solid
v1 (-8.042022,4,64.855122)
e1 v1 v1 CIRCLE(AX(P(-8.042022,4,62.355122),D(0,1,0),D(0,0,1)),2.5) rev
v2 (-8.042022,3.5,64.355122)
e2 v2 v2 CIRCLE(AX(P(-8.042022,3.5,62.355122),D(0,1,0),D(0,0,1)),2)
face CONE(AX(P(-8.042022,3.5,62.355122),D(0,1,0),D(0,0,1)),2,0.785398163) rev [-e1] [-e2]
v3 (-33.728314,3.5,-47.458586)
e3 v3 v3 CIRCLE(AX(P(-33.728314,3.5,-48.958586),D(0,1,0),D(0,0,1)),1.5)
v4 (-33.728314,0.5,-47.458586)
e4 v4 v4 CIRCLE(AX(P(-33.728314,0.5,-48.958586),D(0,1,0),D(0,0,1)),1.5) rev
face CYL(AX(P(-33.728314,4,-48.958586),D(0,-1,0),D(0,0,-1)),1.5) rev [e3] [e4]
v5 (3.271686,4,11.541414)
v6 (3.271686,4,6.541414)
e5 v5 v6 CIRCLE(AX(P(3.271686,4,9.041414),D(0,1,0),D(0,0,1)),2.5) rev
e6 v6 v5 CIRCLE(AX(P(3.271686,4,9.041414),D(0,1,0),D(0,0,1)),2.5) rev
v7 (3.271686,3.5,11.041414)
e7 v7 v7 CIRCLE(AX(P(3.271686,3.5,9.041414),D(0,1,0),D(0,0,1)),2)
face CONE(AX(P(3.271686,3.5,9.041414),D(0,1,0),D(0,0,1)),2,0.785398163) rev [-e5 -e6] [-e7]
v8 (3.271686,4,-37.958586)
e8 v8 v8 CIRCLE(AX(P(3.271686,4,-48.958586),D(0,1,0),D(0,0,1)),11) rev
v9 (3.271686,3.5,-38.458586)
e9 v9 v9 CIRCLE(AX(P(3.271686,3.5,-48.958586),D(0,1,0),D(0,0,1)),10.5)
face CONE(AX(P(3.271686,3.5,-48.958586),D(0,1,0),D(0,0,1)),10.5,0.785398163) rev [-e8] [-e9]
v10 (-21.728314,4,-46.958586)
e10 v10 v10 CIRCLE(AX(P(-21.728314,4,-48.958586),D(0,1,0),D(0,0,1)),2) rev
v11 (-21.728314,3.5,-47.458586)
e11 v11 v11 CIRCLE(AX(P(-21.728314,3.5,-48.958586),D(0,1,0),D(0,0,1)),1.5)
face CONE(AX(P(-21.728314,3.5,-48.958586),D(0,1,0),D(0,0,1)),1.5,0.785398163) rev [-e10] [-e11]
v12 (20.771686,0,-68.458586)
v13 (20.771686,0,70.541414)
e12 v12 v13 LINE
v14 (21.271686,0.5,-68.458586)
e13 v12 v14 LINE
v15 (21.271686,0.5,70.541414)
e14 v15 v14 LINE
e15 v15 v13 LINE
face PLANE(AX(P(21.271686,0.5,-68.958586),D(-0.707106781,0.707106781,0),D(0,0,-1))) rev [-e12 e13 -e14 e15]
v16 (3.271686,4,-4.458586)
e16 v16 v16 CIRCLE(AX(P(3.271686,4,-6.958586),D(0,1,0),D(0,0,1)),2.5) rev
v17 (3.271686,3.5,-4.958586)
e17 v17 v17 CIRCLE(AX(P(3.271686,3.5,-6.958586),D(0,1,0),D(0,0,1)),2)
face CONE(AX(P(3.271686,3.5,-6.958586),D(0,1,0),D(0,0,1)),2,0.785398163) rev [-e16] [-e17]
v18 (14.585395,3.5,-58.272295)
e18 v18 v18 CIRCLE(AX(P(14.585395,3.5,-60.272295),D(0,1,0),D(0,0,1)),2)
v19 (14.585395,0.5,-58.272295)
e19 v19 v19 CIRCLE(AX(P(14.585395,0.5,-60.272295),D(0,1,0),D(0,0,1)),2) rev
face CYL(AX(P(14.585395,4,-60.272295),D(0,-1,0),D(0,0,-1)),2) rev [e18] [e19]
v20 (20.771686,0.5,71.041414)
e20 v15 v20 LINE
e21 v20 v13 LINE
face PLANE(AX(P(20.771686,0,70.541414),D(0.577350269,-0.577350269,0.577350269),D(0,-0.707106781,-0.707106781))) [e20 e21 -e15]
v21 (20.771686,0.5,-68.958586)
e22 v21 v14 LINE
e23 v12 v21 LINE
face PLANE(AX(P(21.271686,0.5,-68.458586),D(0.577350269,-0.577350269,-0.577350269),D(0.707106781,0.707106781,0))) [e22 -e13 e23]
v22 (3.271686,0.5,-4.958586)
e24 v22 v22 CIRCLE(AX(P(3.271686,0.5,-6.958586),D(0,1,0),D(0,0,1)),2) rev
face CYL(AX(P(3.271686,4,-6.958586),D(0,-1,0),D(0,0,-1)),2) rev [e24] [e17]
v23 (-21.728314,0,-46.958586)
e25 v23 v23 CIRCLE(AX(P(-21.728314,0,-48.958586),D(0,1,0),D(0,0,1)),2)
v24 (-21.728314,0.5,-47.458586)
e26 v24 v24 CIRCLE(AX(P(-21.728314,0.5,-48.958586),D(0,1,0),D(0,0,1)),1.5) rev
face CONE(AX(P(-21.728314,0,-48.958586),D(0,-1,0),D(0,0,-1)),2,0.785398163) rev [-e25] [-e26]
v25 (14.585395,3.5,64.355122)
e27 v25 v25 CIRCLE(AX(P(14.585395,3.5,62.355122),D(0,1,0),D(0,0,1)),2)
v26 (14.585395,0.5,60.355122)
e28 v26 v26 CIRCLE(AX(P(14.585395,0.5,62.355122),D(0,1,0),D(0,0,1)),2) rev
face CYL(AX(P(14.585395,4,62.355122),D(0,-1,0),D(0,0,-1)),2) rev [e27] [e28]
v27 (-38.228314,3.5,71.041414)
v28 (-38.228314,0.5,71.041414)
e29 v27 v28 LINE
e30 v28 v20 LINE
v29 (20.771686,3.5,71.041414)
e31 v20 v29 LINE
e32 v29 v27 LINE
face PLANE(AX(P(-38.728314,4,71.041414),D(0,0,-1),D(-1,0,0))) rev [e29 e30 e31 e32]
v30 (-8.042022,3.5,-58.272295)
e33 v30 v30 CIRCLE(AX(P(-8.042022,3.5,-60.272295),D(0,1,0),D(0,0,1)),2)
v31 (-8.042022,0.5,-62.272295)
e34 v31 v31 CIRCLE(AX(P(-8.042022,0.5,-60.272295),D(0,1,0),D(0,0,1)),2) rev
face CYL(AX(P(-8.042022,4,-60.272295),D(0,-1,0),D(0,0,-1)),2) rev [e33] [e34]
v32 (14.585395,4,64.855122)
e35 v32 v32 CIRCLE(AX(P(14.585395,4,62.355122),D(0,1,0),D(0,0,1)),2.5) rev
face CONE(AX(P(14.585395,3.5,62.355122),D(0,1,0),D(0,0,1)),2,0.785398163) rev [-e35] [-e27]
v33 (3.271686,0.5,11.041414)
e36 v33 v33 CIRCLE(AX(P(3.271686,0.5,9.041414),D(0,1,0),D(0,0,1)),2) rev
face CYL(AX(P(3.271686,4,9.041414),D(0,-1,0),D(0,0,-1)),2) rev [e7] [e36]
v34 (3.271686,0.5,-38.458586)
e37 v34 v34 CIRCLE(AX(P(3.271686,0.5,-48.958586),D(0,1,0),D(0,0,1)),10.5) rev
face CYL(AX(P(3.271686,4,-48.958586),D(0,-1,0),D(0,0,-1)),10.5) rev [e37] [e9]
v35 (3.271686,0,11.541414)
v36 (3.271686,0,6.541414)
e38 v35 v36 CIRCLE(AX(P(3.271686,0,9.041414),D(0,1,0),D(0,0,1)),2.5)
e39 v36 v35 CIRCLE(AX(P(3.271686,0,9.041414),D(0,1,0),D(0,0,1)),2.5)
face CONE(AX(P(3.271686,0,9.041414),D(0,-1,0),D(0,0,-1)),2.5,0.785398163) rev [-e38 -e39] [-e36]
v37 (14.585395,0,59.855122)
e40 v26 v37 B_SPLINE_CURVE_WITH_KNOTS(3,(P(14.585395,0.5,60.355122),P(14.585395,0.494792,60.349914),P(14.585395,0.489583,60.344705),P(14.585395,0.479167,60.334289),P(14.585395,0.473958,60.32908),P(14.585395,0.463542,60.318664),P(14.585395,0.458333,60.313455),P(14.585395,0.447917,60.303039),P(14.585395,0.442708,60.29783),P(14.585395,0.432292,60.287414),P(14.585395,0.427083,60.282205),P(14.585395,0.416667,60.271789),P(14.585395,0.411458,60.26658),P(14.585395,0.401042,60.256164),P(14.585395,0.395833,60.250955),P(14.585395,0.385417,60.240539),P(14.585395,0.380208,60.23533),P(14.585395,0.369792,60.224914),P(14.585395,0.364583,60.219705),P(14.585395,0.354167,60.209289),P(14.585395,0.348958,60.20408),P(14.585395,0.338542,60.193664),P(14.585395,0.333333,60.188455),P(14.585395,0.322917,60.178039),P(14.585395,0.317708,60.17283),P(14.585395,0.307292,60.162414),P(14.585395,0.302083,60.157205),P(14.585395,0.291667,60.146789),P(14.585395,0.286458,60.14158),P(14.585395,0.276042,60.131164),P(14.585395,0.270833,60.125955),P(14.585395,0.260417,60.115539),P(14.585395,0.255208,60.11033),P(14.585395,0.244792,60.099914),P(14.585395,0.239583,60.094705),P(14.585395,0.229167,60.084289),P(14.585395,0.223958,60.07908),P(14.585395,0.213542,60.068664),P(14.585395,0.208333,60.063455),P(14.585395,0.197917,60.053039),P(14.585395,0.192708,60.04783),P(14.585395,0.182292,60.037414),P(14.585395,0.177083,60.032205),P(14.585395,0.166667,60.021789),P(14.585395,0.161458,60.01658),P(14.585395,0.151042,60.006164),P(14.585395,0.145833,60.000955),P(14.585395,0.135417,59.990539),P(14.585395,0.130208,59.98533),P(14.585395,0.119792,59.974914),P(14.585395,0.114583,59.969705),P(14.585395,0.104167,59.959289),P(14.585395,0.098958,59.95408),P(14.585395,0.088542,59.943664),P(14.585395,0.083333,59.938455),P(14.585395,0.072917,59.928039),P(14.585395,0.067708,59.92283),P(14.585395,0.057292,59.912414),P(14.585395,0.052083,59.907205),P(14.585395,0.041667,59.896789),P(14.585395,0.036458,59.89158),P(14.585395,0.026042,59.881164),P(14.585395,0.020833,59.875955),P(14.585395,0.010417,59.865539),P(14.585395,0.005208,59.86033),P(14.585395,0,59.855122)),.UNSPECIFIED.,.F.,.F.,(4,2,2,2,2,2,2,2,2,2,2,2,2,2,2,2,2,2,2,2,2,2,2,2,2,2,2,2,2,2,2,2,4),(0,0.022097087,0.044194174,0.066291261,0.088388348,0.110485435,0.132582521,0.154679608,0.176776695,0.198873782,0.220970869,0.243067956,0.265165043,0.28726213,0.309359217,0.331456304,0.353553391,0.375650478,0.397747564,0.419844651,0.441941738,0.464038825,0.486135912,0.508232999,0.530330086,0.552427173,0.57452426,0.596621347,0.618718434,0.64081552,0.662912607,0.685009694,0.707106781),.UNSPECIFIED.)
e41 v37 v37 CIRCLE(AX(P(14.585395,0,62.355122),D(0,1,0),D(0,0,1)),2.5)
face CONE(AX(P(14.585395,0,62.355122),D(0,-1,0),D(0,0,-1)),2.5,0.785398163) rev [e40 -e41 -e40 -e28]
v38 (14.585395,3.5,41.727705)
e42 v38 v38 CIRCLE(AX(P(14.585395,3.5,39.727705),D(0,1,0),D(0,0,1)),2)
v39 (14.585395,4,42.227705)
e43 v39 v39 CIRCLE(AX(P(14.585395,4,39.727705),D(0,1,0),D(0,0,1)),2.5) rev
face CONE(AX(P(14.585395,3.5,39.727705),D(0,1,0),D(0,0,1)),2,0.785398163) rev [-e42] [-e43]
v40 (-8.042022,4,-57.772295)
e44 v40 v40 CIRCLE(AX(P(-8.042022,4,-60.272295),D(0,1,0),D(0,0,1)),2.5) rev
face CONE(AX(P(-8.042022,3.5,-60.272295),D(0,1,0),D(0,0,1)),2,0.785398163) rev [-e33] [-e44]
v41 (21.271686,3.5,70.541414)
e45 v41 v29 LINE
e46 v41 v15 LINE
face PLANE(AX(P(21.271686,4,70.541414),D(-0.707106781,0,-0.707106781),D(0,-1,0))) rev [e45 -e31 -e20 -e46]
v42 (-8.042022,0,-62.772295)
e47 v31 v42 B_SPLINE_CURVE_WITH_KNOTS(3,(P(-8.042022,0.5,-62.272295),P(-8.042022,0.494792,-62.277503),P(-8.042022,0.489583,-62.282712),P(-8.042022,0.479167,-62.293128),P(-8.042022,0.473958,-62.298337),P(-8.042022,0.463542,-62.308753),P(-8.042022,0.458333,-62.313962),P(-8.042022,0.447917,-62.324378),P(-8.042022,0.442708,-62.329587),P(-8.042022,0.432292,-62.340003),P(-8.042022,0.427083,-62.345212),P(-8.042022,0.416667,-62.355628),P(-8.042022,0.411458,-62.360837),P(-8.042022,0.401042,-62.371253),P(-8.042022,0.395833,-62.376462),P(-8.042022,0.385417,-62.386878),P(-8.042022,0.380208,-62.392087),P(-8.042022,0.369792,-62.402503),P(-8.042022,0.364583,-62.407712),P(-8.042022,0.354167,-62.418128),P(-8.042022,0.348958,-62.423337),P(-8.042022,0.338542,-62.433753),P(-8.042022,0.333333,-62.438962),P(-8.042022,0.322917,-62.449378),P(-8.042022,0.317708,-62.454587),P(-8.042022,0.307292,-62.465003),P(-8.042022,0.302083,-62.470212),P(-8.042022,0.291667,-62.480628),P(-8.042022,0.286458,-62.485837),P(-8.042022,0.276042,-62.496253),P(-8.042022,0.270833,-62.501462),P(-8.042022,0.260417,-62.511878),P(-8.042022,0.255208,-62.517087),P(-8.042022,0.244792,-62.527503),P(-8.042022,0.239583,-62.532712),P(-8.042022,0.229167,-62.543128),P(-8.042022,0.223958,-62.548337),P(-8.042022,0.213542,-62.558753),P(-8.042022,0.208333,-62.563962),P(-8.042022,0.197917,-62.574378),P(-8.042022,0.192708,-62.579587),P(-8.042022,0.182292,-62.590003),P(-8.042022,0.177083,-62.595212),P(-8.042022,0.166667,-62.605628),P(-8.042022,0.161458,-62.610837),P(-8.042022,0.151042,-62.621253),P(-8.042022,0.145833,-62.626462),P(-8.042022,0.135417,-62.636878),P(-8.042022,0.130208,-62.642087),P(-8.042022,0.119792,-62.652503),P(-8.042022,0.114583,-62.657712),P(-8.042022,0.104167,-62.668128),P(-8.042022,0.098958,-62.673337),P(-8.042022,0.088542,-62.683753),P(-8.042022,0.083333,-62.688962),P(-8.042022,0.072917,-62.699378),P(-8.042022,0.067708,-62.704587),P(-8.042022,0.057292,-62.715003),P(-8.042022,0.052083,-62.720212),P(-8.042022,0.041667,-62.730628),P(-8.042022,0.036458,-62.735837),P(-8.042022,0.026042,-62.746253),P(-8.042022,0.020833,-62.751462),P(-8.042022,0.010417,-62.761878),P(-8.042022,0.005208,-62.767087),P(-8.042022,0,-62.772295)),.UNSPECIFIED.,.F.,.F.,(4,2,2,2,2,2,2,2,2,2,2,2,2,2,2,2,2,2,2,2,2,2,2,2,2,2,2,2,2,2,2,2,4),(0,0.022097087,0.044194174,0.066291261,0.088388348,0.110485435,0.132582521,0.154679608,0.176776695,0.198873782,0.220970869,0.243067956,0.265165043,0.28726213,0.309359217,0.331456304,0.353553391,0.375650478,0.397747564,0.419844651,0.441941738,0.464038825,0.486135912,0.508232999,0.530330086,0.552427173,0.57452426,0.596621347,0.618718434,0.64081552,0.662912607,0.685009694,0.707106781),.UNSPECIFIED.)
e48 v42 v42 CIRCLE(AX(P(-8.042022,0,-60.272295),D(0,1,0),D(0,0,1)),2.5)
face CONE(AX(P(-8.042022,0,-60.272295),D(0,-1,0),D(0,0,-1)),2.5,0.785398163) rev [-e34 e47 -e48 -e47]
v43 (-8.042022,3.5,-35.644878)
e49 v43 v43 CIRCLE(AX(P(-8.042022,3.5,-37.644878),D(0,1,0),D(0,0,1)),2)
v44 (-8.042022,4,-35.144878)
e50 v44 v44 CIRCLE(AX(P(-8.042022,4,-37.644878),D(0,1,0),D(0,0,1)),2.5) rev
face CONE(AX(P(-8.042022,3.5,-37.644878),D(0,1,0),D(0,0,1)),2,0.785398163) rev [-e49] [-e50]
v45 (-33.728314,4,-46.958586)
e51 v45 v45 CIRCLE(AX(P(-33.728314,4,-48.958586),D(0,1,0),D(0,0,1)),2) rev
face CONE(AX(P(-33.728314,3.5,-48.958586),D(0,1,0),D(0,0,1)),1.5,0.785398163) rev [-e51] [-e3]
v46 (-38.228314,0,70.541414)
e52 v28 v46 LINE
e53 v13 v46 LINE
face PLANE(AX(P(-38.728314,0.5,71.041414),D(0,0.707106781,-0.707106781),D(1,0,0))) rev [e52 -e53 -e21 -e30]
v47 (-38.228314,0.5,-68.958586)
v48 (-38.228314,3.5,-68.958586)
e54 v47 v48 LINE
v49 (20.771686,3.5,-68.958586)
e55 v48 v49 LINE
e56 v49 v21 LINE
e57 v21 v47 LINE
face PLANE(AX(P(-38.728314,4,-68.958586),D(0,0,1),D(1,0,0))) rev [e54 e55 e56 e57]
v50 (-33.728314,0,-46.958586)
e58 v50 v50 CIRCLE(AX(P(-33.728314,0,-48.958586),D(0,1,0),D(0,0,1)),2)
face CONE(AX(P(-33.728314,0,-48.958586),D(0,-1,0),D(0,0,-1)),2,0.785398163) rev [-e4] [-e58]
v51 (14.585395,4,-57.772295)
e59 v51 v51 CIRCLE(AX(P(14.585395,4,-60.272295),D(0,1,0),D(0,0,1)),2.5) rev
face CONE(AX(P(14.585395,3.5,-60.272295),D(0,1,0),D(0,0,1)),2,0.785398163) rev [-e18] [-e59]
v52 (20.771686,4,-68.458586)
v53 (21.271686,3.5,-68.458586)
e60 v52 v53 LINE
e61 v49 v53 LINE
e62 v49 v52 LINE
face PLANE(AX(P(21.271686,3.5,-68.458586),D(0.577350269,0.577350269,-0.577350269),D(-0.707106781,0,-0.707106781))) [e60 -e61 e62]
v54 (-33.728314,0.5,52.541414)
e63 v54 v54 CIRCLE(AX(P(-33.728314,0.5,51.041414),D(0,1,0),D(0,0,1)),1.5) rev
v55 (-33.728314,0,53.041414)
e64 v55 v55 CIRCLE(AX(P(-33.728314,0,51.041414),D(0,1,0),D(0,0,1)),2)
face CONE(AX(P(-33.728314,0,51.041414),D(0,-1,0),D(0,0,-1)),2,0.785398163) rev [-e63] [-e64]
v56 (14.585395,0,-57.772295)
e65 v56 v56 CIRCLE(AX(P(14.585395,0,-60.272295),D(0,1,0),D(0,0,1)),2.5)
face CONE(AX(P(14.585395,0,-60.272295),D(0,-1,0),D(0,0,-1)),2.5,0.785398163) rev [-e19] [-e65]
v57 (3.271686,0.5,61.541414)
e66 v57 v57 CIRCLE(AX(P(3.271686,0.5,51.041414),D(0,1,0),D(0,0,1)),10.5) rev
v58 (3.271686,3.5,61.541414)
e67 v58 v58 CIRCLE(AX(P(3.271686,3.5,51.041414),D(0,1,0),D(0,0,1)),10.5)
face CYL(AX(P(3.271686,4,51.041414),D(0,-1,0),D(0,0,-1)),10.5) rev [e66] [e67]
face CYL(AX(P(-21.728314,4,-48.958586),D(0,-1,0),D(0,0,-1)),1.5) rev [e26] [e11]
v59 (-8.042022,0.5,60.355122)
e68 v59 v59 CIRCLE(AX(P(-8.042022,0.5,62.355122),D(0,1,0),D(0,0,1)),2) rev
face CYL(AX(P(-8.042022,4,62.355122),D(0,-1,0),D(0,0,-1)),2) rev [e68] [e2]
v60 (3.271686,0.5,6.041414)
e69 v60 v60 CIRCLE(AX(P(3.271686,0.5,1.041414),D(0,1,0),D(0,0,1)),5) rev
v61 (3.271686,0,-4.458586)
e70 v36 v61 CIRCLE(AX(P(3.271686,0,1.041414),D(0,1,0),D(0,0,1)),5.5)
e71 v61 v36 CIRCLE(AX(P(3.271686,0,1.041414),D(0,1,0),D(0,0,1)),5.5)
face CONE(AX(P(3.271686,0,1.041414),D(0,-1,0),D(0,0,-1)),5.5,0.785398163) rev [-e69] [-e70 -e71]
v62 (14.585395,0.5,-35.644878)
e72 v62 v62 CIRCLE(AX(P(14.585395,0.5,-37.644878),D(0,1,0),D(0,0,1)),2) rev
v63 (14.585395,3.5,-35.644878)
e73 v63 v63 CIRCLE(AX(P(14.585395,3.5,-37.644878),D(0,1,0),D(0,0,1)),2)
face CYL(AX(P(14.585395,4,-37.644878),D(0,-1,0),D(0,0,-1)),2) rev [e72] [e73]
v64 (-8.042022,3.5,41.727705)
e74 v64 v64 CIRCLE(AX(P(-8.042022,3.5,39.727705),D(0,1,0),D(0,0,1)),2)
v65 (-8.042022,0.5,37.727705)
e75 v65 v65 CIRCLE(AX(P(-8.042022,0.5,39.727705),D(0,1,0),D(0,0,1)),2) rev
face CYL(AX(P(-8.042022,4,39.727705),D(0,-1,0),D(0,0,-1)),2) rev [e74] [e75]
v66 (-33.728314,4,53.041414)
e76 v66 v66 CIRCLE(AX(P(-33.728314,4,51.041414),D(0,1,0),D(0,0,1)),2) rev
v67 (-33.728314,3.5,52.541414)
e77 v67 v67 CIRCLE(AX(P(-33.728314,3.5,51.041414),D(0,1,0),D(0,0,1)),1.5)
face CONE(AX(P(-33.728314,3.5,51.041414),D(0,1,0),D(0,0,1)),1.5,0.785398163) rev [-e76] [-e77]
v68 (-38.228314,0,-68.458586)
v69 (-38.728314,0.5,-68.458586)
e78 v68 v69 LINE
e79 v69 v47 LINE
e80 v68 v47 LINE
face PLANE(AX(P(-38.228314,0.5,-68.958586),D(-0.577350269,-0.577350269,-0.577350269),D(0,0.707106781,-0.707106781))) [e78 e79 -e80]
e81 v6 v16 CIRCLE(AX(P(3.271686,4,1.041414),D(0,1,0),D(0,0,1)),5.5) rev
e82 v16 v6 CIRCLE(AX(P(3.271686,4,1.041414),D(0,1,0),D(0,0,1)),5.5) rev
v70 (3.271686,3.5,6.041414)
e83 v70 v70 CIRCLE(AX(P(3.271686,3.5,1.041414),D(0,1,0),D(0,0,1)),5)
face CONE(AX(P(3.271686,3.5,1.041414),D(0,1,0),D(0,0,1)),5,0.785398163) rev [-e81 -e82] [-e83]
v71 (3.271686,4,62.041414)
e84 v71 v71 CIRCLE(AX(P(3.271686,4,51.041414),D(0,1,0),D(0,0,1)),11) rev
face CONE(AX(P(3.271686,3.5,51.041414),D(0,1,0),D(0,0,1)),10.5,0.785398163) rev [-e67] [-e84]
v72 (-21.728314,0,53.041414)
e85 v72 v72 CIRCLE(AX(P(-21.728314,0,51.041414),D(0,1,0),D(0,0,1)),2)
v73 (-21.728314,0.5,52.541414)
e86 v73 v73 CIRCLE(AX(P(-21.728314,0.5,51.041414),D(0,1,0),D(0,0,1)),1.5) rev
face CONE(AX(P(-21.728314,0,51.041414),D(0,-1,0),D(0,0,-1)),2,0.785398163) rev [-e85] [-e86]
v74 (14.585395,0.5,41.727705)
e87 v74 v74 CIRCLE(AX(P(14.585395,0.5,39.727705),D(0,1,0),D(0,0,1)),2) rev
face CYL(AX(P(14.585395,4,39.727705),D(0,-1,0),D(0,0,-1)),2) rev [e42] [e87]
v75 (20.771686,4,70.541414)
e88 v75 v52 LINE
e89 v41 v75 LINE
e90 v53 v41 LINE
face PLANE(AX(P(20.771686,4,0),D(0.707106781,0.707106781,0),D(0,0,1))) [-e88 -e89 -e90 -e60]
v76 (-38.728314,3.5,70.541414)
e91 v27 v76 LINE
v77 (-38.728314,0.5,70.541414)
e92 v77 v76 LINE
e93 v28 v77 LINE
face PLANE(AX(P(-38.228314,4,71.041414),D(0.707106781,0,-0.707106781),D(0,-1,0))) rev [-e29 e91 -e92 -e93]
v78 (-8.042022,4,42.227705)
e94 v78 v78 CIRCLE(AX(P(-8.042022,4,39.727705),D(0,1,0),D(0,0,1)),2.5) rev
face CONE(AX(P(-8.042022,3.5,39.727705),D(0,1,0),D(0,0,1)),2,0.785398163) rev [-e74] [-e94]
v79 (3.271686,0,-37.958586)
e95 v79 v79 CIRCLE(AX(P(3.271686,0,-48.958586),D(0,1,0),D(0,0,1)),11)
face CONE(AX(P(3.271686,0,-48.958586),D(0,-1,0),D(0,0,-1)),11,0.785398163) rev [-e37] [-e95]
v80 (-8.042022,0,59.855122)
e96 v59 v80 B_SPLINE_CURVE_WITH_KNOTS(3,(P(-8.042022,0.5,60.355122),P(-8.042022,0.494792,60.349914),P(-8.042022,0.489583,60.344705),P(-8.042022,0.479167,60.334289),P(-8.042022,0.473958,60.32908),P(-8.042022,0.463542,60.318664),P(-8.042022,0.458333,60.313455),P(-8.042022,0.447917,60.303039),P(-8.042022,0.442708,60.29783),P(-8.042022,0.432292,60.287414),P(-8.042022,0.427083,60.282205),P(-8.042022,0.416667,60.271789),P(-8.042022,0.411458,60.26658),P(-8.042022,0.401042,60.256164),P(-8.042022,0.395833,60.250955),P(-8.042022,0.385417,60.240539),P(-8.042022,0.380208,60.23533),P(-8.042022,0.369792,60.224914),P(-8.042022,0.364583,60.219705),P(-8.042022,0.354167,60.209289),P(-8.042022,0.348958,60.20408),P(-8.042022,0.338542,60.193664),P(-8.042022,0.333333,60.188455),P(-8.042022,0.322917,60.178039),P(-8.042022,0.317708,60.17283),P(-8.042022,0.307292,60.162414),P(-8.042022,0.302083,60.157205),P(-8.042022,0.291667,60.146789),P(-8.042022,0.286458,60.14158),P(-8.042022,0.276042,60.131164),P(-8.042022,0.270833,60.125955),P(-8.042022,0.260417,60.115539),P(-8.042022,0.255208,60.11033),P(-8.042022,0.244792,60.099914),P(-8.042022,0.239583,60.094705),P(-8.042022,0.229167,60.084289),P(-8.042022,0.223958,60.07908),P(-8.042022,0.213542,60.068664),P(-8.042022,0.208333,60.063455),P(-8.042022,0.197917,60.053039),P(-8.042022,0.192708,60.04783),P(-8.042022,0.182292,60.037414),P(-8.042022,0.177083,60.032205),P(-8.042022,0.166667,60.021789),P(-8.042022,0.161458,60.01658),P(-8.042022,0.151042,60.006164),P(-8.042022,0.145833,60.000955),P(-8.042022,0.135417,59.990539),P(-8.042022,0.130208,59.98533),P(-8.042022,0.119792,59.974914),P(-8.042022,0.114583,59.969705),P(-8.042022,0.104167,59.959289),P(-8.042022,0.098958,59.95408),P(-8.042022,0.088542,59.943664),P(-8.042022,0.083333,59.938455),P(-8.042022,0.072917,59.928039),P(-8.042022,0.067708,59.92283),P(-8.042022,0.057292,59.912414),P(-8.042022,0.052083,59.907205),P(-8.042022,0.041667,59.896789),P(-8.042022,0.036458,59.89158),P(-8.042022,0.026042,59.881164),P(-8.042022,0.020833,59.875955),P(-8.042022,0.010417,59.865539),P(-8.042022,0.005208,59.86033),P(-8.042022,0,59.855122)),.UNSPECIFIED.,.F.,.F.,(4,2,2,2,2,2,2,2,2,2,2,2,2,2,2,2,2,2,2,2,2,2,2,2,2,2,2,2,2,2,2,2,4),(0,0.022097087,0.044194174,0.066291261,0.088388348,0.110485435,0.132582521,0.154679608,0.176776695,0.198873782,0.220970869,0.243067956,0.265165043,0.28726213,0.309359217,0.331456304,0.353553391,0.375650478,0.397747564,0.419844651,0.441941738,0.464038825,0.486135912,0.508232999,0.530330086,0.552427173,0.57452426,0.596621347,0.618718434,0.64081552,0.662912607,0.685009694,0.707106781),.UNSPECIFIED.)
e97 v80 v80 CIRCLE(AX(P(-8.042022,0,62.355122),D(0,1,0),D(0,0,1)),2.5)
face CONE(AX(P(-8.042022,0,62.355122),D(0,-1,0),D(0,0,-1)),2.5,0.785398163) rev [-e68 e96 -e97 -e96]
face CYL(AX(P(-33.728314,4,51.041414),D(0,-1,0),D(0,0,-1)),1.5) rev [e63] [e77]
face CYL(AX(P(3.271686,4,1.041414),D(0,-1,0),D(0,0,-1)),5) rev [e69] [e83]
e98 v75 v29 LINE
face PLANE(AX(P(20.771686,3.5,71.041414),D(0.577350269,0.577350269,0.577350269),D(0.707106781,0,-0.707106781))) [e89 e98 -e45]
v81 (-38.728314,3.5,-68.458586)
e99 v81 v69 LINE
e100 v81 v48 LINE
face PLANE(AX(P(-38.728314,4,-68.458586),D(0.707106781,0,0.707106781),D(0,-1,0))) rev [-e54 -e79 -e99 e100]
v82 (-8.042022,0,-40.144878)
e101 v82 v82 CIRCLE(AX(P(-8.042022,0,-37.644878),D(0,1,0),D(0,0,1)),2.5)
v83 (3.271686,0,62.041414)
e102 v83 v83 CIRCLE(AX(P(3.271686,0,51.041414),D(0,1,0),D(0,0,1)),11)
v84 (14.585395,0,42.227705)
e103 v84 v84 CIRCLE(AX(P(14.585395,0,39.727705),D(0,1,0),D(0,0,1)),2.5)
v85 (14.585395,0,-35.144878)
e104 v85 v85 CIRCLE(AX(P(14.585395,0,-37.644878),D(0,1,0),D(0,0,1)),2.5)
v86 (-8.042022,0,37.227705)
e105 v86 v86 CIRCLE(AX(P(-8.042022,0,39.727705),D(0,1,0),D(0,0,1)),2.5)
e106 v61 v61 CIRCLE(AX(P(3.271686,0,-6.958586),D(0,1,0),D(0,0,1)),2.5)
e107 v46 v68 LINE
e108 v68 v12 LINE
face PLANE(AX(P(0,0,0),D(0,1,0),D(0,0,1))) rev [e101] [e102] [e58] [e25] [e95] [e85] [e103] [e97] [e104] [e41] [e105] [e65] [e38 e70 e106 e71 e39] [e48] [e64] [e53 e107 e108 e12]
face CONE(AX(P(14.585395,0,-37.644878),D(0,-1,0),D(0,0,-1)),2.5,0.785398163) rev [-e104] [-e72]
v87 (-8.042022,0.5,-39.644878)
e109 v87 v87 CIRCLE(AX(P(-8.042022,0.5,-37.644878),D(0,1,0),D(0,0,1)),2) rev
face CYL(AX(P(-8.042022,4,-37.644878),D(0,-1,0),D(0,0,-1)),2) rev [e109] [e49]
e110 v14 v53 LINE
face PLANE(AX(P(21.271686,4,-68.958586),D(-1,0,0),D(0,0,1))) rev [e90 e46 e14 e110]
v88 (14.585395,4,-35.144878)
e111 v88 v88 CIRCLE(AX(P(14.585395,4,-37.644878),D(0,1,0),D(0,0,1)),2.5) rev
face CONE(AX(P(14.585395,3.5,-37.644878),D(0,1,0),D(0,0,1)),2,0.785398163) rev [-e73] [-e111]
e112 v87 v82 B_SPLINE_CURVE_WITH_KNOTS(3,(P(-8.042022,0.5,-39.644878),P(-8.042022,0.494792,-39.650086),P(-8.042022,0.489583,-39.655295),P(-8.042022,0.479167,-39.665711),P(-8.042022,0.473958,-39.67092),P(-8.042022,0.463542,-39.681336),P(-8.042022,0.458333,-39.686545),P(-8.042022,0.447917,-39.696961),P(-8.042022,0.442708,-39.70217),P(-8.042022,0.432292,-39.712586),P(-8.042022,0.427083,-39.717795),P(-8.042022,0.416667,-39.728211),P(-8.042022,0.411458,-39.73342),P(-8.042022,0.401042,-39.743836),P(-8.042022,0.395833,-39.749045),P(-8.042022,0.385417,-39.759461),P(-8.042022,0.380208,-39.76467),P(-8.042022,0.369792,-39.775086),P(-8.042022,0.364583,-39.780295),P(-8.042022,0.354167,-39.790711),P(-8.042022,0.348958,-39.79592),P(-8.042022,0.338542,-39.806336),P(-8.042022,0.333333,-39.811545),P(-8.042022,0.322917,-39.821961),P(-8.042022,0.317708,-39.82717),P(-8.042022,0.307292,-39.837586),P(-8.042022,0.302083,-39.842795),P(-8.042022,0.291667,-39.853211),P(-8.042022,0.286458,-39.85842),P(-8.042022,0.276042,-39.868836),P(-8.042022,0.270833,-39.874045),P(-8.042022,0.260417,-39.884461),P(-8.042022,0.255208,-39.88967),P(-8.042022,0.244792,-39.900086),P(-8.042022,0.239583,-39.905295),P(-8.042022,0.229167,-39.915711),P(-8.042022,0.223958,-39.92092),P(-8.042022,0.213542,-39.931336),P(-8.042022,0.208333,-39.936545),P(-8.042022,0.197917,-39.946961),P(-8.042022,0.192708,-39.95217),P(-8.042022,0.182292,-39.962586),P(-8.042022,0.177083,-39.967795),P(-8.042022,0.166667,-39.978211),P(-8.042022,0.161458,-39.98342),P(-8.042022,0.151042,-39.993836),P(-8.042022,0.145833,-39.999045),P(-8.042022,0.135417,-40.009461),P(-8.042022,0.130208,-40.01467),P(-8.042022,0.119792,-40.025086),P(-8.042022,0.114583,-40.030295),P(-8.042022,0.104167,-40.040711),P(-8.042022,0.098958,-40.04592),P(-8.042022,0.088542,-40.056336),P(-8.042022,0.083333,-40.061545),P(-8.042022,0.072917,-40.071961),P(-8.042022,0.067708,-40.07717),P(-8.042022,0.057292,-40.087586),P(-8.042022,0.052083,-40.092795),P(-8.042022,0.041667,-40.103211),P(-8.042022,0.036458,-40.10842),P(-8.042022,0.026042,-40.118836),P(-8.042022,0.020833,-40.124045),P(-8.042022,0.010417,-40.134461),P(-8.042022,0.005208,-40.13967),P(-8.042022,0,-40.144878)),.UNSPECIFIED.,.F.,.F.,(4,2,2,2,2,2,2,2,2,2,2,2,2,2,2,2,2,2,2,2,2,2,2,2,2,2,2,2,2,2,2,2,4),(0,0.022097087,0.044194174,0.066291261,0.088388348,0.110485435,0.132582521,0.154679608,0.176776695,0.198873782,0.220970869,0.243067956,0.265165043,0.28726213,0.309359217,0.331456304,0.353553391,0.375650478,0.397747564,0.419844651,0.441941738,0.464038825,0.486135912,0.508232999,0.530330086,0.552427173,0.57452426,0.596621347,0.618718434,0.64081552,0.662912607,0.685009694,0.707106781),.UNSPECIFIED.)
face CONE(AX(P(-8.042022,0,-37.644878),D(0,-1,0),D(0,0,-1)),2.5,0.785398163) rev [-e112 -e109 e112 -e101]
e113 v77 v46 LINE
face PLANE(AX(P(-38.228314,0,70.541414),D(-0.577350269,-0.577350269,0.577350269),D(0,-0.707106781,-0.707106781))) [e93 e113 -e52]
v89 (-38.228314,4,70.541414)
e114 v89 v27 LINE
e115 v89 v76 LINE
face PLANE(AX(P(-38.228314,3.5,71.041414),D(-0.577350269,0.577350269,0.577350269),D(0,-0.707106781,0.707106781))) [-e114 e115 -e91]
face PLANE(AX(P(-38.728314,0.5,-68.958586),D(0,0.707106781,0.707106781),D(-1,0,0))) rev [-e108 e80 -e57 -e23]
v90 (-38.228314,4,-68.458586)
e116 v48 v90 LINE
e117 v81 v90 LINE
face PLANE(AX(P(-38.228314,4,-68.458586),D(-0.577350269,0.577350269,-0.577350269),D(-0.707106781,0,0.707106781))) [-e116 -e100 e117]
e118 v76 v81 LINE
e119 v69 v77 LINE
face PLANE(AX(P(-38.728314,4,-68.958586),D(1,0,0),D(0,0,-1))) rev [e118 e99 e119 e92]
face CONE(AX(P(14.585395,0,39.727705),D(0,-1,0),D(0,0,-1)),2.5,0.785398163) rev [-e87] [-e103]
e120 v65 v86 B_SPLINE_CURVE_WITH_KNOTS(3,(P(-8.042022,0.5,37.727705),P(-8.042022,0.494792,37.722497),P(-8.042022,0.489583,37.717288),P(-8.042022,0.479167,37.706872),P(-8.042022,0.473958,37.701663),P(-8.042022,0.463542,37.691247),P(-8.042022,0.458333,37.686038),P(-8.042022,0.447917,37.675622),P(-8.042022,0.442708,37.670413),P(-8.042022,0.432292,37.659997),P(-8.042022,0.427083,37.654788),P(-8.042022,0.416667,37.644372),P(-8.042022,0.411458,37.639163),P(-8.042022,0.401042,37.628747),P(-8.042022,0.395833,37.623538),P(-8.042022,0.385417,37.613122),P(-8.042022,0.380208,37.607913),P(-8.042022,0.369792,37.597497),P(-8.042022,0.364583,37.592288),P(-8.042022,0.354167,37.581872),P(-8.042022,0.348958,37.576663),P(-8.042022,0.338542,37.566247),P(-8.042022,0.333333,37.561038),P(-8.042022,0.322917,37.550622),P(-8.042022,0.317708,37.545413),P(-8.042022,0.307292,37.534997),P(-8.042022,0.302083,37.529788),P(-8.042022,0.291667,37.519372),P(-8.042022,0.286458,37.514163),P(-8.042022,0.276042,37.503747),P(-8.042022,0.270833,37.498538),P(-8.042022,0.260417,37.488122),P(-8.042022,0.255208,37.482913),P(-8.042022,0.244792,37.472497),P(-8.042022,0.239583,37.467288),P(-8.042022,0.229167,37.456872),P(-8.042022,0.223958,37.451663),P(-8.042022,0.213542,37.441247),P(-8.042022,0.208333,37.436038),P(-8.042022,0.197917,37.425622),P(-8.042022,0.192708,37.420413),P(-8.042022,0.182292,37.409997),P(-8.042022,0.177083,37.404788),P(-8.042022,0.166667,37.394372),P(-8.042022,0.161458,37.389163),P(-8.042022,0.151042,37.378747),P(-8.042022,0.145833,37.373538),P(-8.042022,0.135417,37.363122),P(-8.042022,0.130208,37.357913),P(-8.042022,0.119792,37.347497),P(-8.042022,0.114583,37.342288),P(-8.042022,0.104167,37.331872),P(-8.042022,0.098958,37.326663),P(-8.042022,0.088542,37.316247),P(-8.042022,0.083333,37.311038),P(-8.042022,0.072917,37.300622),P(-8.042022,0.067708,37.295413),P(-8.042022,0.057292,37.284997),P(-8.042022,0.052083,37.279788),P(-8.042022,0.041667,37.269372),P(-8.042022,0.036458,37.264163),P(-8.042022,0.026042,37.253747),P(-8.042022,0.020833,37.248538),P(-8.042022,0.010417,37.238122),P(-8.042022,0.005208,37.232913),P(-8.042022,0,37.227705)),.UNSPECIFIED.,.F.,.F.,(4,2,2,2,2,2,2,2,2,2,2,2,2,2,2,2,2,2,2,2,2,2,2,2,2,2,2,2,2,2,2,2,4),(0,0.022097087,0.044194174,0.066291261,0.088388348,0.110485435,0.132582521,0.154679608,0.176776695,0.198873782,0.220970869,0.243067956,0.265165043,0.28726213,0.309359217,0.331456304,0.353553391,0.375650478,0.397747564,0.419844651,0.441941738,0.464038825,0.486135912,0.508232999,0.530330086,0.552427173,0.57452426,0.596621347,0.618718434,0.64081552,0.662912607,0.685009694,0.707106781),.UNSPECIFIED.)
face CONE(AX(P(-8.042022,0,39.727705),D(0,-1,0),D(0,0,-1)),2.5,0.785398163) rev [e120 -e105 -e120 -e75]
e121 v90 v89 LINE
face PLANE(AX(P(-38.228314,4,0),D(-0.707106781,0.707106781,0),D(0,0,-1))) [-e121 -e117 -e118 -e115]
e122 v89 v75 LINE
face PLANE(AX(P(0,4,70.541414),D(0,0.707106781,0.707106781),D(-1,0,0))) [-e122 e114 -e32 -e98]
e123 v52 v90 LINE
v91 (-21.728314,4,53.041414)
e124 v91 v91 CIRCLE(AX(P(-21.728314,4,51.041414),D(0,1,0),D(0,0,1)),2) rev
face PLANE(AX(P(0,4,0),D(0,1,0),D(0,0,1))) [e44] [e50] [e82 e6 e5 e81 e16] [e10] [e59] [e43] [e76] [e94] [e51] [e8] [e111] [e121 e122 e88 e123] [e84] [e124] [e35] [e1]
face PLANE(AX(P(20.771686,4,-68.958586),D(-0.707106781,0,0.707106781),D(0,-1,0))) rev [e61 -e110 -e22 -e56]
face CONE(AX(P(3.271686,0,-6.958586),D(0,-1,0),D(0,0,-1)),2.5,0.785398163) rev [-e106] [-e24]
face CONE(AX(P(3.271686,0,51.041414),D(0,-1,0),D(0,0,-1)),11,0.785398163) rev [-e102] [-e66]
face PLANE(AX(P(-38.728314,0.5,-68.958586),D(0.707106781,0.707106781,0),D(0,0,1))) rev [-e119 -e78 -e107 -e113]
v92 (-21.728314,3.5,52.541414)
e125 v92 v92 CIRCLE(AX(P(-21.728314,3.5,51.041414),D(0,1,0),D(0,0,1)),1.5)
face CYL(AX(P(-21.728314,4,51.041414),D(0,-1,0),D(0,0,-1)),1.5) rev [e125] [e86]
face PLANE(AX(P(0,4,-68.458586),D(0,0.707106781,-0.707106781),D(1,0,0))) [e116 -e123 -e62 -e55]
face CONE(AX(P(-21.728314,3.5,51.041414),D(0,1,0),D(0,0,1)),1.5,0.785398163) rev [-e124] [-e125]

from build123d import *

# Parameters (mm, degrees)
CROQUIS1_W              = 60
CROQUIS1_H              = 140
CROQUIS1_R              = 2
CROQUIS1_R_2            = 5
CROQUIS1_R_3            = 10.5
CROQUIS1_R_4            = 1.5
SALIENTE_EXTRUIR1_DEPTH = 4
CHAFL_N1_SIZE           = 0.5


with BuildPart() as part:
    # Croquis1 → Saliente-Extruir1 (new body)
    with BuildSketch(Plane(origin=(0, 0, 0), x_dir=(1, 0, 0), z_dir=(0, 1, 0))):
        with Locations((-8.728313692, -1.041413592)):
            Rectangle(CROQUIS1_W, CROQUIS1_H)
        with Locations(Location((3.271686308, 6.958586408, 0), (0, 0, 270))):
            Circle(CROQUIS1_R, mode=Mode.SUBTRACT)
        with Locations(Location((3.271686308, -9.041413592, 0), (0, 0, 270))):
            Circle(CROQUIS1_R, mode=Mode.SUBTRACT)
        with Locations(Location((14.585394807, 60.272294907, 0), (0, 0, 270))):
            Circle(CROQUIS1_R, mode=Mode.SUBTRACT)
        with Locations(Location((14.585394807, -39.727705093, 0), (0, 0, 270))):
            Circle(CROQUIS1_R, mode=Mode.SUBTRACT)
        with Locations(Location((-8.042022191, -39.727705093, 0), (0, 0, 90))):
            Circle(CROQUIS1_R, mode=Mode.SUBTRACT)
        with Locations(Location((-8.042022191, -62.355122091, 0), (0, 0, 270))):
            Circle(CROQUIS1_R, mode=Mode.SUBTRACT)
        with Locations(Location((3.271686308, -1.041413592, 0), (0, 0, 270))):
            Circle(CROQUIS1_R_2, mode=Mode.SUBTRACT)
        with Locations(Location((14.585394807, -62.355122091, 0), (0, 0, 90))):
            Circle(CROQUIS1_R, mode=Mode.SUBTRACT)
        with Locations(Location((3.271686308, -51.041413592, 0), (0, 0, 270))):
            Circle(CROQUIS1_R_3, mode=Mode.SUBTRACT)
        with Locations(Location((3.271686308, 48.958586408, 0), (0, 0, 270))):
            Circle(CROQUIS1_R_3, mode=Mode.SUBTRACT)
        with Locations(Location((-8.042022191, 60.272294907, 0), (0, 0, 90))):
            Circle(CROQUIS1_R, mode=Mode.SUBTRACT)
        with Locations(Location((14.585394807, 37.644877909, 0), (0, 0, 90))):
            Circle(CROQUIS1_R, mode=Mode.SUBTRACT)
        with Locations(Location((-8.042022191, 37.644877909, 0), (0, 0, 270))):
            Circle(CROQUIS1_R, mode=Mode.SUBTRACT)
        with Locations(Location((-21.728313692, -51.041413592, 0), (0, 0, 270))):
            Circle(CROQUIS1_R_4, mode=Mode.SUBTRACT)
        with Locations(Location((-33.728313692, -51.041413592, 0), (0, 0, 270))):
            Circle(CROQUIS1_R_4, mode=Mode.SUBTRACT)
        with Locations(Location((-21.728313692, 48.958586408, 0), (0, 0, 90))):
            Circle(CROQUIS1_R_4, mode=Mode.SUBTRACT)
        with Locations(Location((-33.728313692, 48.958586408, 0), (0, 0, 90))):
            Circle(CROQUIS1_R_4, mode=Mode.SUBTRACT)
    extrude(amount=SALIENTE_EXTRUIR1_DEPTH)

    # Chaflán1
    chafl_n1_edges = [part.edges().sort_by_distance(p)[0] for p in [
        (21.271686308, 4, 1.041413592),
        (3.271686308, 0, -8.958586408),
        (3.271686308, 4, -8.958586408),
        (-8.728313692, 4, -68.958586408),
        (3.271686308, 0, 7.041413592),
        (3.271686308, 4, 7.041413592),
        (14.585394807, 0, 37.727705093),
        (14.585394807, 4, 37.727705093),
        (-8.042022191, 0, 41.727705093),
        (-8.042022191, 4, 41.727705093),
        (3.271686308, 0, -3.958586408),
        (3.271686308, 4, -3.958586408),
        (-8.042022191, 0, 60.355122091),
        (-8.042022191, 4, 60.355122091),
        (3.271686308, 0, 40.541413592),
        (3.271686308, 4, 40.541413592),
        (3.271686308, 0, -59.458586408),
        (3.271686308, 4, -59.458586408),
        (-38.728313692, 4, 1.041413592),
        (14.585394807, 0, 64.355122091),
        (14.585394807, 4, 64.355122091),
        (-8.728313692, 0, -68.958586408),
        (14.585394807, 0, -62.272294907),
        (14.585394807, 4, -62.272294907),
        (21.271686308, 0, 1.041413592),
        (-8.042022191, 0, -58.272294907),
        (-8.042022191, 4, -58.272294907),
        (-8.728313692, 0, 71.041413592),
        (14.585394807, 0, -35.644877909),
        (14.585394807, 4, -35.644877909),
        (-38.728313692, 0, 1.041413592),
        (-8.042022191, 0, -39.644877909),
        (-8.042022191, 4, -39.644877909),
        (-21.728313692, 0, 49.541413592),
        (-21.728313692, 4, 49.541413592),
        (-33.728313692, 0, 49.541413592),
        (-33.728313692, 4, 49.541413592),
        (-21.728313692, 0, -47.458586408),
        (-21.728313692, 4, -47.458586408),
        (-8.728313692, 4, 71.041413592),
        (-33.728313692, 0, -47.458586408),
        (-33.728313692, 4, -47.458586408),
        (-38.728313692, 2, -68.958586408),
        (21.271686308, 2, -68.958586408),
        (21.271686308, 2, 71.041413592),
        (-38.728313692, 2, 71.041413592),
    ]]
    chamfer(chafl_n1_edges, length=CHAFL_N1_SIZE - 0.0001)  # a hair under: the kernel refuses the full size


solid = part.part
